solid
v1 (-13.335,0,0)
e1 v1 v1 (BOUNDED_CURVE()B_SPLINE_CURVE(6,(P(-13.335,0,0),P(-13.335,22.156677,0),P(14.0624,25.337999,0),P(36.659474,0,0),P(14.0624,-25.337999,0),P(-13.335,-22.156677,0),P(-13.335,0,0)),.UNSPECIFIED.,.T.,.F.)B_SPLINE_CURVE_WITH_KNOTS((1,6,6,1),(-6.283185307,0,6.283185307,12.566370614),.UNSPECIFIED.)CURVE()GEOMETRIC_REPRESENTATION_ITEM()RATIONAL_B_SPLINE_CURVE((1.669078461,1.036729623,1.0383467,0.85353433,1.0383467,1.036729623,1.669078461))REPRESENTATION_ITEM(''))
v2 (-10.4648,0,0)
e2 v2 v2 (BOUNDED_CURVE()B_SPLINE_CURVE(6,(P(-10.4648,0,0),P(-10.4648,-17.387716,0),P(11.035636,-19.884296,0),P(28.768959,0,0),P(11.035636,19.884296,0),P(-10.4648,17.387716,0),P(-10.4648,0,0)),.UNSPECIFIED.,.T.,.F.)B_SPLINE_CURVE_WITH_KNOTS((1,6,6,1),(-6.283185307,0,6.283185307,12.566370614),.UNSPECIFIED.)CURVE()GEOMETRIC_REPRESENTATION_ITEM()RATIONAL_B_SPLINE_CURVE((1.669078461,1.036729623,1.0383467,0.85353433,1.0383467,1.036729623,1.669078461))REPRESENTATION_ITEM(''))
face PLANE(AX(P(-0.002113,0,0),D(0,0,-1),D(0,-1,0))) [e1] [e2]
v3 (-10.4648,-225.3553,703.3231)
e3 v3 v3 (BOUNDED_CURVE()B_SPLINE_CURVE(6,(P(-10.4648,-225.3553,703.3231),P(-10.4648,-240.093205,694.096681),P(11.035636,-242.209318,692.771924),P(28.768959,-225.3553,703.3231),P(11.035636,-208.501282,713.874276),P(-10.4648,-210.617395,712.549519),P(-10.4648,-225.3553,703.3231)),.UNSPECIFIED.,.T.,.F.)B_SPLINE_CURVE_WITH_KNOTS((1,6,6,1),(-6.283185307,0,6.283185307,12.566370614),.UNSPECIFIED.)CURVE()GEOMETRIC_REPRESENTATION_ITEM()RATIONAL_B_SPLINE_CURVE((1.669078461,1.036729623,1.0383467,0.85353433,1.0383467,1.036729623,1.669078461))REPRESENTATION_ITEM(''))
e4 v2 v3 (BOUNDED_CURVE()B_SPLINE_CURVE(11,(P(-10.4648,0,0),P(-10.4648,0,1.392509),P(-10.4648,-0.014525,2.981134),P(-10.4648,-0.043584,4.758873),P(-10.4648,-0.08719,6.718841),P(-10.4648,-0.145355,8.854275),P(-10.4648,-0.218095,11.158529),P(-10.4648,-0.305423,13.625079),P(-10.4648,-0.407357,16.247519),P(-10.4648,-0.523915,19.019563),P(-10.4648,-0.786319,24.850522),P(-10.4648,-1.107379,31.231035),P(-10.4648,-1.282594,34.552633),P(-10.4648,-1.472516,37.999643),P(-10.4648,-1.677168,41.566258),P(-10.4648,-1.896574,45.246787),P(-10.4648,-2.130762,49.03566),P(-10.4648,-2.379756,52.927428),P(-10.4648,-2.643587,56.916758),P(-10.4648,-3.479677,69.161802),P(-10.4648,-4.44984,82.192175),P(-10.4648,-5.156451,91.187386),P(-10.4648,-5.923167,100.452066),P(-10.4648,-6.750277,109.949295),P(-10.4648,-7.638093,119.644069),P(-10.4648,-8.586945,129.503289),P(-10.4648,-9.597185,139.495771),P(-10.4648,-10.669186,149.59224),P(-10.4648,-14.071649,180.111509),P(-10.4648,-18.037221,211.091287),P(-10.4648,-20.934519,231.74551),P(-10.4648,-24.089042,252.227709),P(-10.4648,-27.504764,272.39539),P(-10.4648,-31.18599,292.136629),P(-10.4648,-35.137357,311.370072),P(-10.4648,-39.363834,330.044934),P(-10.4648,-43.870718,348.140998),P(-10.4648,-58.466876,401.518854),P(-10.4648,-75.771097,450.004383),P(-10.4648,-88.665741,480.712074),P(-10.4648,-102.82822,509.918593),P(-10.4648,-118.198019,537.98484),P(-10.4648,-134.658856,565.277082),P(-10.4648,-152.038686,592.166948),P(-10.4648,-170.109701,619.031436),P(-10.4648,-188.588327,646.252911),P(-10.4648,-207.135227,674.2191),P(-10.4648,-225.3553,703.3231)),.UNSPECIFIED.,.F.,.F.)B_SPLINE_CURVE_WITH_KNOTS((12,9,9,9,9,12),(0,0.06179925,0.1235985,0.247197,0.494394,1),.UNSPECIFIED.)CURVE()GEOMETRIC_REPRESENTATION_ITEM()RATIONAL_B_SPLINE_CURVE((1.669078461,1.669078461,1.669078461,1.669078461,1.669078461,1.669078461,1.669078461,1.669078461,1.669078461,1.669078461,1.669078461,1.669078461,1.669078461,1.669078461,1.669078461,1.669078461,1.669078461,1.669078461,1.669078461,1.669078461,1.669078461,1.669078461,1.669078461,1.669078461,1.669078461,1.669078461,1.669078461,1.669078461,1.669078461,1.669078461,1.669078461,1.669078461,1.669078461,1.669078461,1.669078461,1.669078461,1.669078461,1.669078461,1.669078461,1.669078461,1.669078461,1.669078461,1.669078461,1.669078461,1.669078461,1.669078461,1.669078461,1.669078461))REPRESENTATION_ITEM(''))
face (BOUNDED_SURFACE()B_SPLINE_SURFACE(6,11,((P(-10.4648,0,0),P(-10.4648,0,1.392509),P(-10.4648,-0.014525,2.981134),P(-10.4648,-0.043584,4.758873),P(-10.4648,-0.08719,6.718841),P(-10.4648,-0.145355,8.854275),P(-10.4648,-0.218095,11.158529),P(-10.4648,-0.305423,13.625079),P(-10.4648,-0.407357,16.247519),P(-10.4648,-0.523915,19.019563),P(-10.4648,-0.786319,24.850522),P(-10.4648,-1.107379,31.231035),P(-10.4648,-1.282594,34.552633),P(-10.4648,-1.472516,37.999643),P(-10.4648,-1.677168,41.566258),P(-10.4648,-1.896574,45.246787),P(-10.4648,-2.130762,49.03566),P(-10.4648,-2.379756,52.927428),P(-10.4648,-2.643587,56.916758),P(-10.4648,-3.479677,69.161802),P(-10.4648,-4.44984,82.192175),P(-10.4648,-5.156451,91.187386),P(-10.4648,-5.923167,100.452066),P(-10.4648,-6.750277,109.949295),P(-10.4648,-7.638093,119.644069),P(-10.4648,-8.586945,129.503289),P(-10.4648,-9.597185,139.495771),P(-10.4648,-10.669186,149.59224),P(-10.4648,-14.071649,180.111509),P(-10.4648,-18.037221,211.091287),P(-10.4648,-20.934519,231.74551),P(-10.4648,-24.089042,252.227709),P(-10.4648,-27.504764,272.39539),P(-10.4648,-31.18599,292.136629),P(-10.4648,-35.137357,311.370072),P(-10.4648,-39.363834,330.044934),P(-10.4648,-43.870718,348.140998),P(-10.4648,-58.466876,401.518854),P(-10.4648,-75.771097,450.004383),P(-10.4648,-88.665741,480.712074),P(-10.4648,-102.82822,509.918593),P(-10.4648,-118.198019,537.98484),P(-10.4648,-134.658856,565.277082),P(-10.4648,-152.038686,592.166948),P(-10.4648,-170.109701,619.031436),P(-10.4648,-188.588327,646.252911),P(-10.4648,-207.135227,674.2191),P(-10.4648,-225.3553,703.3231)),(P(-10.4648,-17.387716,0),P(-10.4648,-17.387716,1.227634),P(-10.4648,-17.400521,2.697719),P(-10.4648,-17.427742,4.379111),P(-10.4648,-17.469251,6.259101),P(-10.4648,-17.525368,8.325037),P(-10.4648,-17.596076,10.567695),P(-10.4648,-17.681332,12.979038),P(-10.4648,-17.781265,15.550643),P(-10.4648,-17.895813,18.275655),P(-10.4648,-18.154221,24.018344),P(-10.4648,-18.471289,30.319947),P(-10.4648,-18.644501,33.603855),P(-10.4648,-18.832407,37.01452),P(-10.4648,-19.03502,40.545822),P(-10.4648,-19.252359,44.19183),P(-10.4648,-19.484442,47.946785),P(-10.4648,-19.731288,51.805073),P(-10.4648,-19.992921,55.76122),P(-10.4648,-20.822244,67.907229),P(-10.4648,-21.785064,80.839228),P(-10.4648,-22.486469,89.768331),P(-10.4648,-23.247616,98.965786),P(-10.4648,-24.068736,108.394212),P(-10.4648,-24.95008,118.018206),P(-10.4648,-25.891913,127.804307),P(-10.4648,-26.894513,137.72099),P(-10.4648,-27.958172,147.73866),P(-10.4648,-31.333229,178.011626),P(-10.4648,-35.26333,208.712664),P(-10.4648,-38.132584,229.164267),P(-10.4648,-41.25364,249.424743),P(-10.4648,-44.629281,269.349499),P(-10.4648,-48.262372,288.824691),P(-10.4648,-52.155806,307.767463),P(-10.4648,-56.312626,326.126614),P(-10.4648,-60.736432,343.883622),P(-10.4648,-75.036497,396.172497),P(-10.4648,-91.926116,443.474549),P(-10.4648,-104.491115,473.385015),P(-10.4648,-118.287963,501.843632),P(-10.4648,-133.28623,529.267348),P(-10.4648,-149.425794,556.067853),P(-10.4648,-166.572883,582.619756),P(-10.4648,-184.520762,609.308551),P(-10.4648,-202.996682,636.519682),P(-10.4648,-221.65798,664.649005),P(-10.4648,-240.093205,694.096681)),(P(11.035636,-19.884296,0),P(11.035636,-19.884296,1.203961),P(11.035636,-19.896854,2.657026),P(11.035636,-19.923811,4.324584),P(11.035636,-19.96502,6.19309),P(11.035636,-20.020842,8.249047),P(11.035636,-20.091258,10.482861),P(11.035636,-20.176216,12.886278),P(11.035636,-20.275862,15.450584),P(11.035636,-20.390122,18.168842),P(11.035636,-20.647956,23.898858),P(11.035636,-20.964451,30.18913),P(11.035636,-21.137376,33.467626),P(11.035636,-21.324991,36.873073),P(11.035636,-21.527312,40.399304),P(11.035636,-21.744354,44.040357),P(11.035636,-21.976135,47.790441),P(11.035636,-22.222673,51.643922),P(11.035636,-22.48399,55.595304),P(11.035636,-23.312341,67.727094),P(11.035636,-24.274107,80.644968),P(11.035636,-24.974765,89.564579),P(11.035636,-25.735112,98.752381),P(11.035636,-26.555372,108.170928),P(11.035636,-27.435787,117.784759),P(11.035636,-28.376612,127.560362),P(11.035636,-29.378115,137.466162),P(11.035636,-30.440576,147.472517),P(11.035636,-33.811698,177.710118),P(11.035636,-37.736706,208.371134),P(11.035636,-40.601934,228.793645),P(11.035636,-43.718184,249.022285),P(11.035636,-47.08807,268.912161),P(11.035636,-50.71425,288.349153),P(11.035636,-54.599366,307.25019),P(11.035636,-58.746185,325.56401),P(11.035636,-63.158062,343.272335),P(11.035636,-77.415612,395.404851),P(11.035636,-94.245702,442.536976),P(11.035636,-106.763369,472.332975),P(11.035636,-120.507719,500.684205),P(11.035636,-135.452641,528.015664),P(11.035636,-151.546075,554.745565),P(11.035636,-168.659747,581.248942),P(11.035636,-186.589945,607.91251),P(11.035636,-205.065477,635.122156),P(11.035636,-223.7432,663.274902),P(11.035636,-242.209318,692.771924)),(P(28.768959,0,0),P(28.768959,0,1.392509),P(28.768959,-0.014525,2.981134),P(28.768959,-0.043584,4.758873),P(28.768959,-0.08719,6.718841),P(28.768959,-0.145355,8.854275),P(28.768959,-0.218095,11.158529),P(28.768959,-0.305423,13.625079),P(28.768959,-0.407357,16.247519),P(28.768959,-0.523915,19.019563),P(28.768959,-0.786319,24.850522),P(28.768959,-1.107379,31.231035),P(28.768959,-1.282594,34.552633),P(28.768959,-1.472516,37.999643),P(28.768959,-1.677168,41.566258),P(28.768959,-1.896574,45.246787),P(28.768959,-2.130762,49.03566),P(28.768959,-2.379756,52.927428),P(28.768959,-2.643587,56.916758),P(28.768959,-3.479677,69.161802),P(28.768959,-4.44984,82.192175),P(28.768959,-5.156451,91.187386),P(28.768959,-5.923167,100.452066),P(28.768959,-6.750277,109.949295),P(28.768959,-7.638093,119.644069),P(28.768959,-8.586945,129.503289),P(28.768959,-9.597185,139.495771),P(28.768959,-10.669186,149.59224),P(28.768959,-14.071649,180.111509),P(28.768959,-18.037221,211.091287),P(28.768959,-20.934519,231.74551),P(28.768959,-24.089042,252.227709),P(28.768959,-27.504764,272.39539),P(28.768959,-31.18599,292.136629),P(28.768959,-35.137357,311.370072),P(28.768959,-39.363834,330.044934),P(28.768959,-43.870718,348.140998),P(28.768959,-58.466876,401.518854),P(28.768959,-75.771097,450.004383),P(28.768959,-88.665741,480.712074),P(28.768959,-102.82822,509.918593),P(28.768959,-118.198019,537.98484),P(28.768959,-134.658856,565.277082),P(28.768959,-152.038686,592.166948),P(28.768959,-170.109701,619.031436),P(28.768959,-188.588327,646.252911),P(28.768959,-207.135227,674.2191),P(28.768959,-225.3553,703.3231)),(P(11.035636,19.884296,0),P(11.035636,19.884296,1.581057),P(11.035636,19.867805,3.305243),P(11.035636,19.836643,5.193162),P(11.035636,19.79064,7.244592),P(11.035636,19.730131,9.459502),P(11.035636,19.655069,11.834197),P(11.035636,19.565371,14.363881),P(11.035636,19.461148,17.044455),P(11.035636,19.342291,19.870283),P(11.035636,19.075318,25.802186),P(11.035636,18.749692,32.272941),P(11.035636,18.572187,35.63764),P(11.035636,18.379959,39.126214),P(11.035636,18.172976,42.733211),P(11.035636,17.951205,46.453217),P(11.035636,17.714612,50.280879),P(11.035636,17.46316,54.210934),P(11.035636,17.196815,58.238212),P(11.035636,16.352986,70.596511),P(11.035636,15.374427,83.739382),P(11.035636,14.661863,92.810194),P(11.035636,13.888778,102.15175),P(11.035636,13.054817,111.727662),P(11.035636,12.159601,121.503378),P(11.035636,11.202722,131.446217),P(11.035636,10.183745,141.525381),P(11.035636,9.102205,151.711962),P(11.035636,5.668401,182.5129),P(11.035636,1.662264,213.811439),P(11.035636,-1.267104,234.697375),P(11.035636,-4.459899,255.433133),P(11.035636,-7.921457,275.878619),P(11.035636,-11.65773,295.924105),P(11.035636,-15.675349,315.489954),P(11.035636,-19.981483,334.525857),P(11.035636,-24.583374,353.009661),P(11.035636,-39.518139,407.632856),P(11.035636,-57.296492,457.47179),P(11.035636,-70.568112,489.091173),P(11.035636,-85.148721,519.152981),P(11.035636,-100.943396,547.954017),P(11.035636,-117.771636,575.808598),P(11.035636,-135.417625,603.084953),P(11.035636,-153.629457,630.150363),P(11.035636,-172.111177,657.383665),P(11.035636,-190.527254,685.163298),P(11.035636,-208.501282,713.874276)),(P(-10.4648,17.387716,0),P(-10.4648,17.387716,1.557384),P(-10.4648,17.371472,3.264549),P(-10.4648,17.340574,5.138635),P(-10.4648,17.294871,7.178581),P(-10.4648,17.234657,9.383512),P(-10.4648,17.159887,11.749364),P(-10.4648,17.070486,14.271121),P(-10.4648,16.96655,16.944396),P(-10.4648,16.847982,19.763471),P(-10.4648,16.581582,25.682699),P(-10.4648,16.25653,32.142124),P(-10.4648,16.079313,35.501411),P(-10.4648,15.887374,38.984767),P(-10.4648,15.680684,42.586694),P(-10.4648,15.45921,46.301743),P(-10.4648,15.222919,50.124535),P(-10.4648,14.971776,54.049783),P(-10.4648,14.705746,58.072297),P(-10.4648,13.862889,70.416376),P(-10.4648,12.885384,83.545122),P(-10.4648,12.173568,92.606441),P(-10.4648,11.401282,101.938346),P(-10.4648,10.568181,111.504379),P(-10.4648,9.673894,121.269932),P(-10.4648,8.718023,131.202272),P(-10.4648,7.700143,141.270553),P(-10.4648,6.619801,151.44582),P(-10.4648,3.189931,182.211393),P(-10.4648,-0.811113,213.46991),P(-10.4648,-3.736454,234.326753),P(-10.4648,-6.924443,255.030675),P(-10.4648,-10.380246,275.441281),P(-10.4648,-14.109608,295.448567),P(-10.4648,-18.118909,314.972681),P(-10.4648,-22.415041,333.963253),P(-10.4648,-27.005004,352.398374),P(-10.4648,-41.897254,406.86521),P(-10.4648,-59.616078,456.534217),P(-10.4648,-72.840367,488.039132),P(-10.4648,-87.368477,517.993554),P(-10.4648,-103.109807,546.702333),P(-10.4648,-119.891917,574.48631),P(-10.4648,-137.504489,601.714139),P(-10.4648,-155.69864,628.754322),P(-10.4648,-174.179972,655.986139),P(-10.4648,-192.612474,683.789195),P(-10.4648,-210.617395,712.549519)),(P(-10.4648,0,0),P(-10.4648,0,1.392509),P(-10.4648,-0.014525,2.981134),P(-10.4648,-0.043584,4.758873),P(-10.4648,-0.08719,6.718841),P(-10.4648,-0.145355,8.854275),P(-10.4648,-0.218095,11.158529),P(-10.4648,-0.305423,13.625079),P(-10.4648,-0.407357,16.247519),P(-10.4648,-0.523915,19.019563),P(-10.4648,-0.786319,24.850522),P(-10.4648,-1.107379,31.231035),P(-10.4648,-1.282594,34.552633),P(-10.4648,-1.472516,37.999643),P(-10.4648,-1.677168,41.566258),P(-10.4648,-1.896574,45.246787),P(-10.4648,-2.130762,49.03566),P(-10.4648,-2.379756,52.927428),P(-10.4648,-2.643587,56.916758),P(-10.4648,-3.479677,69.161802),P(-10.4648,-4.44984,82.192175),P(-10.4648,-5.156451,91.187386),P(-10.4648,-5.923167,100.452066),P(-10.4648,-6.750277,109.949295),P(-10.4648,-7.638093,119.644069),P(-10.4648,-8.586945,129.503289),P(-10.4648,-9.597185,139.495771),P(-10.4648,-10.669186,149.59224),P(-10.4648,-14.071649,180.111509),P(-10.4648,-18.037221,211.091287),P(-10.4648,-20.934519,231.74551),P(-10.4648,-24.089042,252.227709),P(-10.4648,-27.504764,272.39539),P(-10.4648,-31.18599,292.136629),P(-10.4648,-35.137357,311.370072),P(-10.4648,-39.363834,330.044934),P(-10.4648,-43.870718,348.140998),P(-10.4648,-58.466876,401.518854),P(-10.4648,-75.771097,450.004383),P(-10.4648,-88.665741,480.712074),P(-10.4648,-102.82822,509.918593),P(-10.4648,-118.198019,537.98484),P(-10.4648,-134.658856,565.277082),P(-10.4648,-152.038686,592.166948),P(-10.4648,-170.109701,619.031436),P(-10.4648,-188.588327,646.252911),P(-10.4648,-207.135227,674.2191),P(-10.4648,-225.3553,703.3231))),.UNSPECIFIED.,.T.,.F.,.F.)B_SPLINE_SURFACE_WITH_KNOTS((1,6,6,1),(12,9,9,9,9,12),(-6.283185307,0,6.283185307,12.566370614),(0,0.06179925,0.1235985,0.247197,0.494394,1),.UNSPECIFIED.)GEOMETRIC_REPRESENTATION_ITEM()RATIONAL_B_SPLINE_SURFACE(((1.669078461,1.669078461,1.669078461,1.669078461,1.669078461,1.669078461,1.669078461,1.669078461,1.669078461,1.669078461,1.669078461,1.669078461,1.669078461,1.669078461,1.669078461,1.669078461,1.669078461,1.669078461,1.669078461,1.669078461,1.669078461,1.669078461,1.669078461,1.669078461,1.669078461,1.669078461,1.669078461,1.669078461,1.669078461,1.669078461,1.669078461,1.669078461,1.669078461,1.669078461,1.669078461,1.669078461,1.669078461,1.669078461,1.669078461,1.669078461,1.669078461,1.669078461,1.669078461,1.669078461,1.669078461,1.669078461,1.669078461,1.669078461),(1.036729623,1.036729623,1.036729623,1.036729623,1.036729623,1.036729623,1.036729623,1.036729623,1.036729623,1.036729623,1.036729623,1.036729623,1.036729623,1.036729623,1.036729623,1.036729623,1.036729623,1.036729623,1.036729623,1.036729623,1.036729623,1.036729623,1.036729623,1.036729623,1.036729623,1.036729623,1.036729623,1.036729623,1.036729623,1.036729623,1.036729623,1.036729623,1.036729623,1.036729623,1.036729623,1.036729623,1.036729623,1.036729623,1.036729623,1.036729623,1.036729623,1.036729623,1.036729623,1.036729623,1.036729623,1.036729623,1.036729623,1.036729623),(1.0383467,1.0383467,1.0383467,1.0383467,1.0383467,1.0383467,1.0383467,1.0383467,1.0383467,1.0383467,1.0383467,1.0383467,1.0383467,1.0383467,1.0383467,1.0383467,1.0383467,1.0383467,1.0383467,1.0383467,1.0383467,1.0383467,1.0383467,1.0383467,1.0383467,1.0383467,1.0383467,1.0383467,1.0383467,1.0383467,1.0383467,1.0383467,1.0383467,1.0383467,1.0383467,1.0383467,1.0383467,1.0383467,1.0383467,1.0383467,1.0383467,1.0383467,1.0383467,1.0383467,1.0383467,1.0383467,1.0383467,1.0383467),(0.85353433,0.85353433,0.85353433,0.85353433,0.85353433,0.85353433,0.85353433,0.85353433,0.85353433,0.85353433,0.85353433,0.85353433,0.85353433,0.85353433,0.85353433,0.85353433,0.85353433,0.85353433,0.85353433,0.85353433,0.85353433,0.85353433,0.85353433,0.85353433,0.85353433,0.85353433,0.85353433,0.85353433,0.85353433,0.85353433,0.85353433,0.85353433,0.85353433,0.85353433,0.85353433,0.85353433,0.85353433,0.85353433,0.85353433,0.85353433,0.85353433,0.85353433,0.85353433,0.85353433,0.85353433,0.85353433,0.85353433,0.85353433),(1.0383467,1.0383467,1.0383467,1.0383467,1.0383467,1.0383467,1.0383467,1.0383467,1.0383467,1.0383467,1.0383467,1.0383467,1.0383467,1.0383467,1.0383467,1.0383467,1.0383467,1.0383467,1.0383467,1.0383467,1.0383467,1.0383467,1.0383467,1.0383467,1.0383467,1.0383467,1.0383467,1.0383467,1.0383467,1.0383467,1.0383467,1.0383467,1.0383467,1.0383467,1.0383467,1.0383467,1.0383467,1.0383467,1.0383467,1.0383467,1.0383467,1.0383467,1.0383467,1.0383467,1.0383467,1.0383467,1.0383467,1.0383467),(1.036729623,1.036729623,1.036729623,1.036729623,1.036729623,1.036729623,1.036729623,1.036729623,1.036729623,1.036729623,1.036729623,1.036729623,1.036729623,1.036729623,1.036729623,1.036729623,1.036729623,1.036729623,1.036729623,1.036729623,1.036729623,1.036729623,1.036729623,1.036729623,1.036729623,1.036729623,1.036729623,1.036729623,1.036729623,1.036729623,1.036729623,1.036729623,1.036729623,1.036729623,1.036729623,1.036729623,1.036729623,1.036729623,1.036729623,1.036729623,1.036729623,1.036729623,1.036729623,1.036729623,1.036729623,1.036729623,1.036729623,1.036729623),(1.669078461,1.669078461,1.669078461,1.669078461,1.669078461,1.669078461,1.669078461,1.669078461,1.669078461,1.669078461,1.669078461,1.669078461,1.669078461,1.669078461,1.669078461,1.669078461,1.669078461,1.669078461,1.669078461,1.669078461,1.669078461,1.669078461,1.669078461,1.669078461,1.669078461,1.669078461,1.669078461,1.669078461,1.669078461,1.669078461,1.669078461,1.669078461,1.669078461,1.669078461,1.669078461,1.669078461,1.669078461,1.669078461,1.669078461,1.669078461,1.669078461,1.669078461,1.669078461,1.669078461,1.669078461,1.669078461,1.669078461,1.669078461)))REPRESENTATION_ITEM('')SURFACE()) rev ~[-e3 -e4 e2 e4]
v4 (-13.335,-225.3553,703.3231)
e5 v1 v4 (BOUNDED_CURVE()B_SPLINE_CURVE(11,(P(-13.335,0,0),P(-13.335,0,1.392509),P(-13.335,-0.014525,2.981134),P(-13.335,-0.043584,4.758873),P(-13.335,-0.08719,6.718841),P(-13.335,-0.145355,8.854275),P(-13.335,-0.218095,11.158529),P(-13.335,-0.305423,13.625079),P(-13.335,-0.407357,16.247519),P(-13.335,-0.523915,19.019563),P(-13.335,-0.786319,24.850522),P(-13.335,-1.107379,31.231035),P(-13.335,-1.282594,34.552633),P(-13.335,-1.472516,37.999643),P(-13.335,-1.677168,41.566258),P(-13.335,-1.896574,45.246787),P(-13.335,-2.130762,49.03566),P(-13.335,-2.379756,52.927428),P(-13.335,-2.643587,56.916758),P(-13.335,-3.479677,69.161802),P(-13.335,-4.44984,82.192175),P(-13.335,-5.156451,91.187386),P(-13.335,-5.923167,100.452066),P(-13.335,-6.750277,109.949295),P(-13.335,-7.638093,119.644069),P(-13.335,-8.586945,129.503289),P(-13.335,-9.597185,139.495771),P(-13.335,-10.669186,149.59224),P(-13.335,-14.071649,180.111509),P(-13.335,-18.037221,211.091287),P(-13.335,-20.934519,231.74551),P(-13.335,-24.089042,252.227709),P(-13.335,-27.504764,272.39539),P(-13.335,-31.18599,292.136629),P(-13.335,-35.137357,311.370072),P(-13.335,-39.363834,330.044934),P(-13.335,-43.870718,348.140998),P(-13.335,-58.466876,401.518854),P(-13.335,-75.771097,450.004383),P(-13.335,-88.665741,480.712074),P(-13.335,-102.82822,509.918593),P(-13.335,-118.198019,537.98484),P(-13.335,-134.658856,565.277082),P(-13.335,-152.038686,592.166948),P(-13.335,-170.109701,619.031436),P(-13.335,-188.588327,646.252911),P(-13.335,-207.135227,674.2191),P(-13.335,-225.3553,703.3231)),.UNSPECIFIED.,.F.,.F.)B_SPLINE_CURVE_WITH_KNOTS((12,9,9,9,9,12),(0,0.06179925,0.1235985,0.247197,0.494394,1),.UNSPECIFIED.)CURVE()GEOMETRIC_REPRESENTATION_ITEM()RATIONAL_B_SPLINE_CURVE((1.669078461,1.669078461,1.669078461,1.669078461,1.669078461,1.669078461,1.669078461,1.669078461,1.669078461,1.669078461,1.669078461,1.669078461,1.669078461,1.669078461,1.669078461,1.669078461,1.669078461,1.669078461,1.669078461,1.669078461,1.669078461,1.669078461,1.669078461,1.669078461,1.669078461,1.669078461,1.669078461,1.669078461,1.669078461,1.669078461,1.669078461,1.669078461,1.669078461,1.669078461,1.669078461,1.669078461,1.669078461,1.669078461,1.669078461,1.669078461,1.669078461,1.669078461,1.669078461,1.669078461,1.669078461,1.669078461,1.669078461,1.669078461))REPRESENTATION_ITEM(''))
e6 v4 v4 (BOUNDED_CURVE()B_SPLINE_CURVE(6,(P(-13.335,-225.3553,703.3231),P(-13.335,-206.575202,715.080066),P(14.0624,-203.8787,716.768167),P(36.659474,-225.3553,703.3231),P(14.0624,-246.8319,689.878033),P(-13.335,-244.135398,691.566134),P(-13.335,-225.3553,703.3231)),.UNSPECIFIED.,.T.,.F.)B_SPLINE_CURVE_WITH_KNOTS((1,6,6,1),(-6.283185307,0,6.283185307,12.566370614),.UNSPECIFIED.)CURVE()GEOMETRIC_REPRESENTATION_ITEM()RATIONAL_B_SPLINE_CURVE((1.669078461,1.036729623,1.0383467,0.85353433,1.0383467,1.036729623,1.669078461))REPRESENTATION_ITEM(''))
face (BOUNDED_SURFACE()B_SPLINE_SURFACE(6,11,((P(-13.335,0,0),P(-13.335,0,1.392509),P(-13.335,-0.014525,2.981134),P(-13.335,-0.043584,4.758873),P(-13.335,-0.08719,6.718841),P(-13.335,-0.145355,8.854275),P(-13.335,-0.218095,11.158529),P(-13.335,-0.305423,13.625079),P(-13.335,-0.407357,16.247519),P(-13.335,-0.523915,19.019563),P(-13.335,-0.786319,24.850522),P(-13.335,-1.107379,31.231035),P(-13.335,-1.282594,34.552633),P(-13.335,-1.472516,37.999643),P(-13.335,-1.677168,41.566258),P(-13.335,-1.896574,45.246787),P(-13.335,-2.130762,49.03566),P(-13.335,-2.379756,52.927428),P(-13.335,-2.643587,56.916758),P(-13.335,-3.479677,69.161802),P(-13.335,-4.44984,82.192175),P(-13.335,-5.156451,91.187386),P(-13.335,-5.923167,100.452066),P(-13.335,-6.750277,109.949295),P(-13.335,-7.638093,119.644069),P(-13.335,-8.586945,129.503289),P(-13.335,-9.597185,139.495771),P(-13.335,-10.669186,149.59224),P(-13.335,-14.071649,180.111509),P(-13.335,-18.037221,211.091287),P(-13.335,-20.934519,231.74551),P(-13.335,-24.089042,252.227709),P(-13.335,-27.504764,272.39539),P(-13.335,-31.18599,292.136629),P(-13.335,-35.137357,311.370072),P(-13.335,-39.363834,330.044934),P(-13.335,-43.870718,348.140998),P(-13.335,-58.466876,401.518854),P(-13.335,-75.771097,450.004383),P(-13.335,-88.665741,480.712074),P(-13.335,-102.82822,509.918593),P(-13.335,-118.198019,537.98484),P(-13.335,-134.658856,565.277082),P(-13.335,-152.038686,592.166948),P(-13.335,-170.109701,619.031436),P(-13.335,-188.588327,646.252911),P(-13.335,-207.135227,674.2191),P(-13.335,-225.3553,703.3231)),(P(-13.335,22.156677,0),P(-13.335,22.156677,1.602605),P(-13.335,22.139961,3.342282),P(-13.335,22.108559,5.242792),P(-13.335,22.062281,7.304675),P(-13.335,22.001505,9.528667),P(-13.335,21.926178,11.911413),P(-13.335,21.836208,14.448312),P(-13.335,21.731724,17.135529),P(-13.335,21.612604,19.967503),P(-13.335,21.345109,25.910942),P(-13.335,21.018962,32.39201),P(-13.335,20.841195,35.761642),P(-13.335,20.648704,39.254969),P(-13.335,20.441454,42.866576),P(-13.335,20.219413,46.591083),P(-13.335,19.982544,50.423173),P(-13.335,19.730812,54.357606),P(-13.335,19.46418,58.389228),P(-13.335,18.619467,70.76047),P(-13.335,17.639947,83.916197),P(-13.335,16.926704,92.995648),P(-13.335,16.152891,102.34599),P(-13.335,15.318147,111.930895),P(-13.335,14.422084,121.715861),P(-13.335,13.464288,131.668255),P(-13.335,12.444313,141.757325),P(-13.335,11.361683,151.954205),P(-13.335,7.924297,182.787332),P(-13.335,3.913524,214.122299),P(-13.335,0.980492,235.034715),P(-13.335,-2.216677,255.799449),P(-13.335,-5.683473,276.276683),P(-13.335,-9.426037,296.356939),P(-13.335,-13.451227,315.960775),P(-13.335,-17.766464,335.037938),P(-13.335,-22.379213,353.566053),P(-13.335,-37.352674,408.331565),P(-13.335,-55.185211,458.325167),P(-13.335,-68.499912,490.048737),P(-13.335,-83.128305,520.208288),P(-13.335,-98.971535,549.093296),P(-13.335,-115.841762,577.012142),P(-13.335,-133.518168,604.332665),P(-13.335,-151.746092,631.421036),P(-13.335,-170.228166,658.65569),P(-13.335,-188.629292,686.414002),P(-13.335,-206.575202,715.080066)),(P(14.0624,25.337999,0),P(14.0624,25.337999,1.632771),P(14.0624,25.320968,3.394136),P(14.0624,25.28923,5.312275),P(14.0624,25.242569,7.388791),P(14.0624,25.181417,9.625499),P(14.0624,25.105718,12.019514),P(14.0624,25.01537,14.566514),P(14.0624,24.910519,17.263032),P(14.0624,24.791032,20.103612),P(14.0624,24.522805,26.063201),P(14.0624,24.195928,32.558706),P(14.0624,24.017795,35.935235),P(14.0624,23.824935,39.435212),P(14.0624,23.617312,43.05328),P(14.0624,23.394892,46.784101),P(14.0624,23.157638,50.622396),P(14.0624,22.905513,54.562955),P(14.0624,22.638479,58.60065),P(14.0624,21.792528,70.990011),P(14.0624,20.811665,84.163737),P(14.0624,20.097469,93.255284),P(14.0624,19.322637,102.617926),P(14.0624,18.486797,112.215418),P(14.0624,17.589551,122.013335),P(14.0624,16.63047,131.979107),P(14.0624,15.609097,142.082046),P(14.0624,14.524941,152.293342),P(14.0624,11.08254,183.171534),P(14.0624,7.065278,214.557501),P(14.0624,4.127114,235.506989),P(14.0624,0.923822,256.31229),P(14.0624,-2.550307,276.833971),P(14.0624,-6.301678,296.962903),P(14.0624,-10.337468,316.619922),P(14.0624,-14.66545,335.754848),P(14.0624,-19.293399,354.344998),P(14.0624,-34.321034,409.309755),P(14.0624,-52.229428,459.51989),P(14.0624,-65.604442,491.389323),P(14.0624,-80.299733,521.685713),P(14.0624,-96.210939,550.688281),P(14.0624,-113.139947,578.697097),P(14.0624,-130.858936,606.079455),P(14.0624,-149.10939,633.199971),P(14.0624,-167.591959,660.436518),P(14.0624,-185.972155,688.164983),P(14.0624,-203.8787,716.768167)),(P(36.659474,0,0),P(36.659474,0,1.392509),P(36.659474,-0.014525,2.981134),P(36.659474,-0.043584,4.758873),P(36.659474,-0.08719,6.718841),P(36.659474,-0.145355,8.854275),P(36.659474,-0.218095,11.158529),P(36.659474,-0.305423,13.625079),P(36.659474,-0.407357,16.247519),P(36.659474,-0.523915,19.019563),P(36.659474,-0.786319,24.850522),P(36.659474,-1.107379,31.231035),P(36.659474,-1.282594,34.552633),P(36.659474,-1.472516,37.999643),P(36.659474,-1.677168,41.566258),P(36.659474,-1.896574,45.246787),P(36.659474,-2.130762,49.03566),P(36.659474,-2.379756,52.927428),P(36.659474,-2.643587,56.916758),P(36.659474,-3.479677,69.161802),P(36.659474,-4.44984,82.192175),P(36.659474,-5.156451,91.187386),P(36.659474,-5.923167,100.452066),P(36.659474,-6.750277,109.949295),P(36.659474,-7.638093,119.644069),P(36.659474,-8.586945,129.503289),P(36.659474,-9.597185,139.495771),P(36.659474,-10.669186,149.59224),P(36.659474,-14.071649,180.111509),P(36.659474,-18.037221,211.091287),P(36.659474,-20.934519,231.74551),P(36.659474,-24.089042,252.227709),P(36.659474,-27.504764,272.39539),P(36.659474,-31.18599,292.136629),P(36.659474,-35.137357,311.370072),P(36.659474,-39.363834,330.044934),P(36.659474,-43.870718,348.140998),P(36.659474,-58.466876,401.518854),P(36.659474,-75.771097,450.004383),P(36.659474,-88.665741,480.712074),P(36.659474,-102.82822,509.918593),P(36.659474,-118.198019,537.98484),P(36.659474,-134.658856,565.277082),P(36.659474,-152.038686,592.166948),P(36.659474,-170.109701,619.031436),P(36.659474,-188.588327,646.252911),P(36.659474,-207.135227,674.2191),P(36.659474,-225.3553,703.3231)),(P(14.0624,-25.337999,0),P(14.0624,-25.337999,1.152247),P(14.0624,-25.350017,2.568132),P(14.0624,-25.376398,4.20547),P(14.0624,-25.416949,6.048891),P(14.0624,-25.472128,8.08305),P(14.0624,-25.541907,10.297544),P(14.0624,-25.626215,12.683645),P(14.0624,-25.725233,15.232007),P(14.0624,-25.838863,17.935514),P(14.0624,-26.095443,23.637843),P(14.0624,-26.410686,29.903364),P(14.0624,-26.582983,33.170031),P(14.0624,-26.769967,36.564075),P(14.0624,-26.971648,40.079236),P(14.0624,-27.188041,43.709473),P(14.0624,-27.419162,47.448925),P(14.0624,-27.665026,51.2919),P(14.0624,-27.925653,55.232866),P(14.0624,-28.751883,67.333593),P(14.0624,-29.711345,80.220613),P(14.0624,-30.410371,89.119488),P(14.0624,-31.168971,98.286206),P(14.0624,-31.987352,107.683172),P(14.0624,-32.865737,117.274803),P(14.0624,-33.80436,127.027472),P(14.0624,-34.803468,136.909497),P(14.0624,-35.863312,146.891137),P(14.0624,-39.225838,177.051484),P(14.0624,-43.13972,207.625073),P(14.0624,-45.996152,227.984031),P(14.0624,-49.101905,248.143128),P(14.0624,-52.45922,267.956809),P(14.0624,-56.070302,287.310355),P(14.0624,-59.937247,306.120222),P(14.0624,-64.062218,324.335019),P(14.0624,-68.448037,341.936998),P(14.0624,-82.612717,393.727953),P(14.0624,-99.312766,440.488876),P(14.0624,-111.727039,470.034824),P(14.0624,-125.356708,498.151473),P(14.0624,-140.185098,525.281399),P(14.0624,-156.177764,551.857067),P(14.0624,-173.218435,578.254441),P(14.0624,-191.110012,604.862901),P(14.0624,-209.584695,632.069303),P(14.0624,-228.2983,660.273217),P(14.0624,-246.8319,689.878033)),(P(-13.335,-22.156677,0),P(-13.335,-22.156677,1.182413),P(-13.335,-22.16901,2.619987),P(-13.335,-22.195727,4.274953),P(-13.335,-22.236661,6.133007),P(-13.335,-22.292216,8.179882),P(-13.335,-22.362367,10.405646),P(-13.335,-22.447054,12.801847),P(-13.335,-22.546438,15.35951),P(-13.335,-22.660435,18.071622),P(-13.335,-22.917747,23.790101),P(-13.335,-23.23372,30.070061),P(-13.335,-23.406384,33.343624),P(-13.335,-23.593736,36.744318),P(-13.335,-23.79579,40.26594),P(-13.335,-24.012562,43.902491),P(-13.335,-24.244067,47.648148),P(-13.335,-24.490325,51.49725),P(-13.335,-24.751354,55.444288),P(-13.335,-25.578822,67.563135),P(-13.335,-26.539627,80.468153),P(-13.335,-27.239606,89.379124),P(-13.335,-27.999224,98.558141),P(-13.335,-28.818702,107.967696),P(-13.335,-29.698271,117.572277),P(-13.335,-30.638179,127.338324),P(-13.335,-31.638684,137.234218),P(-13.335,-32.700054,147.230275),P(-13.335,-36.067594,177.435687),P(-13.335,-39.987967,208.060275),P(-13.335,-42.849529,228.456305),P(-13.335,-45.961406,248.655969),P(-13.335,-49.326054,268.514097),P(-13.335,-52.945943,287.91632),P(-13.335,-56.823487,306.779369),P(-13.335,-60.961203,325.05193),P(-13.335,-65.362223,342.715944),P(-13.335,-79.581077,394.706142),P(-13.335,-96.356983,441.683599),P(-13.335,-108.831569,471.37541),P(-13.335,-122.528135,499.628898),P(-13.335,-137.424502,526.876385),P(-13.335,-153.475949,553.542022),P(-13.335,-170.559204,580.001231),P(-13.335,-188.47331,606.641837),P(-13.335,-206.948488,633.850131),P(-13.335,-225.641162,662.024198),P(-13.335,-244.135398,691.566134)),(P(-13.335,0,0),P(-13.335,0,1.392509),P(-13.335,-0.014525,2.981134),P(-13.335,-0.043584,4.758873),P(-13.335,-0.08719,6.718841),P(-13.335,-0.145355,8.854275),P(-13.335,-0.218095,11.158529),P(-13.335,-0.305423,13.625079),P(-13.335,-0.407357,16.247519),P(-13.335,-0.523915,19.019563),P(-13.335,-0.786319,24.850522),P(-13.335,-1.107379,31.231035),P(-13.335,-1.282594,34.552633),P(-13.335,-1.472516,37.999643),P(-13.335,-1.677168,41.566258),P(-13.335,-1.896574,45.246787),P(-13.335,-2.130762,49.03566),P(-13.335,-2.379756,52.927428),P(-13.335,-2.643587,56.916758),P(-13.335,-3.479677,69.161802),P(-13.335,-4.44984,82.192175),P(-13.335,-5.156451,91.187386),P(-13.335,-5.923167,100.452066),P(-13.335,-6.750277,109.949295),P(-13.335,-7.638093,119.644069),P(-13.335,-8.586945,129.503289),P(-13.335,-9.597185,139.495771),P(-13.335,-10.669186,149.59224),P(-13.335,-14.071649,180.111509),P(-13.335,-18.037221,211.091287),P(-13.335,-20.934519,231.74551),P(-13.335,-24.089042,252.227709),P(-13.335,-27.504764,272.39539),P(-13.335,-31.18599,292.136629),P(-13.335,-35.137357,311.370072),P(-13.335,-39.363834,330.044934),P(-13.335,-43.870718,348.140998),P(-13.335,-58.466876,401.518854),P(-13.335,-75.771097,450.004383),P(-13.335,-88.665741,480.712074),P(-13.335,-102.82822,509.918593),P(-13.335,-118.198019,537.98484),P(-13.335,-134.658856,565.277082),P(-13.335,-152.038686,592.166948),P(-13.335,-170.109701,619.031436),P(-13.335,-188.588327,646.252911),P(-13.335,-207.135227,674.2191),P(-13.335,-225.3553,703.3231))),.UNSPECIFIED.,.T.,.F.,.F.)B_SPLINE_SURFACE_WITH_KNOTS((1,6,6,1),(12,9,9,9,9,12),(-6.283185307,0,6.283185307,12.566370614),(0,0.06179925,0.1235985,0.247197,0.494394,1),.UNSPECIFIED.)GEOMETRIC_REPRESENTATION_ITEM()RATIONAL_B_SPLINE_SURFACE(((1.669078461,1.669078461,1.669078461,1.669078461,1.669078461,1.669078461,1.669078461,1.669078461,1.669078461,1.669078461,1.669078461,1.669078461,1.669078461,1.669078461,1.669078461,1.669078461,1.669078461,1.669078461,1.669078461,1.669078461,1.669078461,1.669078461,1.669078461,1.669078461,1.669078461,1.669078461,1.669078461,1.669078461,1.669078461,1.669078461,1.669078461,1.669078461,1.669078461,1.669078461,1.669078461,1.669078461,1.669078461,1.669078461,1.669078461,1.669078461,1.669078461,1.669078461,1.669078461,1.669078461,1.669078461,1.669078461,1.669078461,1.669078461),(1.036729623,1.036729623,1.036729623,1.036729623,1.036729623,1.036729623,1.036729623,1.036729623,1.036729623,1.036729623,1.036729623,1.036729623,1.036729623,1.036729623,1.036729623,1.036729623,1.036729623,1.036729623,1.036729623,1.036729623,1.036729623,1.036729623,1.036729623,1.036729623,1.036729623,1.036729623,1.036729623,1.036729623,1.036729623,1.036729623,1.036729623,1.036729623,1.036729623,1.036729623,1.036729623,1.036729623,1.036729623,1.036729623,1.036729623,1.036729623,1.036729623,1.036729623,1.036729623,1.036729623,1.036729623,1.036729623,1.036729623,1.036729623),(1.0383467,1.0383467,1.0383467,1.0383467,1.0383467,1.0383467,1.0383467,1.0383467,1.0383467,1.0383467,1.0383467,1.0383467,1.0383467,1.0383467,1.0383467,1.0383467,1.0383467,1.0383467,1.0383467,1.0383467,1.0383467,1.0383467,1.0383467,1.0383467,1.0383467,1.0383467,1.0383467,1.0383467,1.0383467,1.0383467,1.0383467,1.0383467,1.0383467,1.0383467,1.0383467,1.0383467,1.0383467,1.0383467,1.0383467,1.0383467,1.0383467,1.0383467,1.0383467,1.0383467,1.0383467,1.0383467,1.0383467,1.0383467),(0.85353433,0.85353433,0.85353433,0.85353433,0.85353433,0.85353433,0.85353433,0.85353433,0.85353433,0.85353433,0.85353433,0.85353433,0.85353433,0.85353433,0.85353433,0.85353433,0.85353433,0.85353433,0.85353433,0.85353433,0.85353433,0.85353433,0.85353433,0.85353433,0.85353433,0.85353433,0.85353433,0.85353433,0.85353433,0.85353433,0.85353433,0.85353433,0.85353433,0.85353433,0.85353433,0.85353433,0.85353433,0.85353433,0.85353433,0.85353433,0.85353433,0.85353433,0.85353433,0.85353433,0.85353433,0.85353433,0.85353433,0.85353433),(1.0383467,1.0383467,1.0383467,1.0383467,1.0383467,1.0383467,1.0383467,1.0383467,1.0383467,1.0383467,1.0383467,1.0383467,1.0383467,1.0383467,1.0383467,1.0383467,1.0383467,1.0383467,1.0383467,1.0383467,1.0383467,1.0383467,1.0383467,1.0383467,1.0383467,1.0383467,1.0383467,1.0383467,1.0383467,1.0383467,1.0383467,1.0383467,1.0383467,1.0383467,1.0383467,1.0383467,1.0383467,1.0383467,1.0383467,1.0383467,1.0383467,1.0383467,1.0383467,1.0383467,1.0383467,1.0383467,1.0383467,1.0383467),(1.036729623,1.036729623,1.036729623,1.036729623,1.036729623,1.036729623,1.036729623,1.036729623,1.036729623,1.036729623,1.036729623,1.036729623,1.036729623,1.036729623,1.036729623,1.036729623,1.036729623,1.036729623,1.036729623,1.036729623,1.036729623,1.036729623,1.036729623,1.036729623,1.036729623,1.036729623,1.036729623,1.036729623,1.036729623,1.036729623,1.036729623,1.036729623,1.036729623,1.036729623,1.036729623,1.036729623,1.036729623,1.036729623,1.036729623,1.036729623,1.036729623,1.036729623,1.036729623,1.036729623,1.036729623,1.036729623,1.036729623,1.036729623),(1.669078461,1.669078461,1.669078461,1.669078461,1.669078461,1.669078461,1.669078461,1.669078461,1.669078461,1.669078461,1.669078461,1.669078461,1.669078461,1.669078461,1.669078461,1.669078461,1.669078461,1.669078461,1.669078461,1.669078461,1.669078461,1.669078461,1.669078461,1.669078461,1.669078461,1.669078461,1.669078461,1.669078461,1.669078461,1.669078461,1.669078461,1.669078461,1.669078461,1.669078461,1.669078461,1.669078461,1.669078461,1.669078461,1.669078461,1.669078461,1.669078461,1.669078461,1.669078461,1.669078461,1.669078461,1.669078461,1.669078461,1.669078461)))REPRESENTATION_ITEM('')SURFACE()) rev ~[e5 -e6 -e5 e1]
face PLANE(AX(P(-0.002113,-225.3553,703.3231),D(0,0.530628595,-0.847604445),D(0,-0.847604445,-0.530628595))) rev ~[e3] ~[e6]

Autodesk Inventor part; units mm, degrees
ref_plane "Plano inicial" through (0, 0, 0) normal (0, 0, 1) x (1, 0, 0)
ref_plane "Plano final" through (0, 0, 752.6401) normal (0, 0, 1) x (1, 0, 0)
sketch "Boceto" plane through (0, 0, 0) normal (0, 0, -1) x (-1, 0, 0)
  circle A0 centre (0, 0) radius 10.4648
  circle A1 centre (0, 0) radius 13.335
  dimension "d0" = 26.67
  dimension "d1" = 2.8702
sketch "Sketch3" plane through (0, 0, 0) normal (0, 0, 1) x (1, 0, 0)
  line L0 (0, 0) -> (10, 0)
ref_plane "Work Plane3" through (0, 0, 0) normal (0, -1, 0) x (1, 0, 0)
sketch "Sketch4" plane through (0, 0, 0) normal (0, -1, 0) x (1, 0, 0)
  line L0 (-2, 0) -> (12, 0)
  line L1 (-2, 752.6401) -> (12, 752.6401)
  dimension "d7" = 752.6401
ref_plane "Plano de trabajo de orientación" through (0, 0, 0) normal (0, 0, -1) x (-1, 0, 0)
sketch3d "Trayectoria de barrido"
  spline S0 degree 4 poles (0, 0, 0) (0, 0, 30.6352) (0, -17.2354, 325.3192) (0, -70.2254, 485.6185) (0, -175.2501, 623.2871) (0, -225.3553, 703.3231) knots 0 0 0 0 0 0.494394 1 1 1 1 1 weights 1 1 1 1 1 1
sweep "Cuerpo" add profiles "Boceto" path "Trayectoria de barrido"
equation "\"d0\" = G_H"
equation "\"d1\" = G_T"
equation "\"G_H\" = 26.67"
equation "\"G_T\" = 2.8702"
equation "\"G_L\" = d7"
equation "\"G_OFFSET_START\" = 0"
equation "\"G_OFFSET_END\" = 0"
equation "\"d5\" = G_OFFSET_END + B_L"
equation "\"B_L\" = 752.64011"
properties part number "ANSI - 3/4 x 0.113 - 29,632" material "Acero, suave"
